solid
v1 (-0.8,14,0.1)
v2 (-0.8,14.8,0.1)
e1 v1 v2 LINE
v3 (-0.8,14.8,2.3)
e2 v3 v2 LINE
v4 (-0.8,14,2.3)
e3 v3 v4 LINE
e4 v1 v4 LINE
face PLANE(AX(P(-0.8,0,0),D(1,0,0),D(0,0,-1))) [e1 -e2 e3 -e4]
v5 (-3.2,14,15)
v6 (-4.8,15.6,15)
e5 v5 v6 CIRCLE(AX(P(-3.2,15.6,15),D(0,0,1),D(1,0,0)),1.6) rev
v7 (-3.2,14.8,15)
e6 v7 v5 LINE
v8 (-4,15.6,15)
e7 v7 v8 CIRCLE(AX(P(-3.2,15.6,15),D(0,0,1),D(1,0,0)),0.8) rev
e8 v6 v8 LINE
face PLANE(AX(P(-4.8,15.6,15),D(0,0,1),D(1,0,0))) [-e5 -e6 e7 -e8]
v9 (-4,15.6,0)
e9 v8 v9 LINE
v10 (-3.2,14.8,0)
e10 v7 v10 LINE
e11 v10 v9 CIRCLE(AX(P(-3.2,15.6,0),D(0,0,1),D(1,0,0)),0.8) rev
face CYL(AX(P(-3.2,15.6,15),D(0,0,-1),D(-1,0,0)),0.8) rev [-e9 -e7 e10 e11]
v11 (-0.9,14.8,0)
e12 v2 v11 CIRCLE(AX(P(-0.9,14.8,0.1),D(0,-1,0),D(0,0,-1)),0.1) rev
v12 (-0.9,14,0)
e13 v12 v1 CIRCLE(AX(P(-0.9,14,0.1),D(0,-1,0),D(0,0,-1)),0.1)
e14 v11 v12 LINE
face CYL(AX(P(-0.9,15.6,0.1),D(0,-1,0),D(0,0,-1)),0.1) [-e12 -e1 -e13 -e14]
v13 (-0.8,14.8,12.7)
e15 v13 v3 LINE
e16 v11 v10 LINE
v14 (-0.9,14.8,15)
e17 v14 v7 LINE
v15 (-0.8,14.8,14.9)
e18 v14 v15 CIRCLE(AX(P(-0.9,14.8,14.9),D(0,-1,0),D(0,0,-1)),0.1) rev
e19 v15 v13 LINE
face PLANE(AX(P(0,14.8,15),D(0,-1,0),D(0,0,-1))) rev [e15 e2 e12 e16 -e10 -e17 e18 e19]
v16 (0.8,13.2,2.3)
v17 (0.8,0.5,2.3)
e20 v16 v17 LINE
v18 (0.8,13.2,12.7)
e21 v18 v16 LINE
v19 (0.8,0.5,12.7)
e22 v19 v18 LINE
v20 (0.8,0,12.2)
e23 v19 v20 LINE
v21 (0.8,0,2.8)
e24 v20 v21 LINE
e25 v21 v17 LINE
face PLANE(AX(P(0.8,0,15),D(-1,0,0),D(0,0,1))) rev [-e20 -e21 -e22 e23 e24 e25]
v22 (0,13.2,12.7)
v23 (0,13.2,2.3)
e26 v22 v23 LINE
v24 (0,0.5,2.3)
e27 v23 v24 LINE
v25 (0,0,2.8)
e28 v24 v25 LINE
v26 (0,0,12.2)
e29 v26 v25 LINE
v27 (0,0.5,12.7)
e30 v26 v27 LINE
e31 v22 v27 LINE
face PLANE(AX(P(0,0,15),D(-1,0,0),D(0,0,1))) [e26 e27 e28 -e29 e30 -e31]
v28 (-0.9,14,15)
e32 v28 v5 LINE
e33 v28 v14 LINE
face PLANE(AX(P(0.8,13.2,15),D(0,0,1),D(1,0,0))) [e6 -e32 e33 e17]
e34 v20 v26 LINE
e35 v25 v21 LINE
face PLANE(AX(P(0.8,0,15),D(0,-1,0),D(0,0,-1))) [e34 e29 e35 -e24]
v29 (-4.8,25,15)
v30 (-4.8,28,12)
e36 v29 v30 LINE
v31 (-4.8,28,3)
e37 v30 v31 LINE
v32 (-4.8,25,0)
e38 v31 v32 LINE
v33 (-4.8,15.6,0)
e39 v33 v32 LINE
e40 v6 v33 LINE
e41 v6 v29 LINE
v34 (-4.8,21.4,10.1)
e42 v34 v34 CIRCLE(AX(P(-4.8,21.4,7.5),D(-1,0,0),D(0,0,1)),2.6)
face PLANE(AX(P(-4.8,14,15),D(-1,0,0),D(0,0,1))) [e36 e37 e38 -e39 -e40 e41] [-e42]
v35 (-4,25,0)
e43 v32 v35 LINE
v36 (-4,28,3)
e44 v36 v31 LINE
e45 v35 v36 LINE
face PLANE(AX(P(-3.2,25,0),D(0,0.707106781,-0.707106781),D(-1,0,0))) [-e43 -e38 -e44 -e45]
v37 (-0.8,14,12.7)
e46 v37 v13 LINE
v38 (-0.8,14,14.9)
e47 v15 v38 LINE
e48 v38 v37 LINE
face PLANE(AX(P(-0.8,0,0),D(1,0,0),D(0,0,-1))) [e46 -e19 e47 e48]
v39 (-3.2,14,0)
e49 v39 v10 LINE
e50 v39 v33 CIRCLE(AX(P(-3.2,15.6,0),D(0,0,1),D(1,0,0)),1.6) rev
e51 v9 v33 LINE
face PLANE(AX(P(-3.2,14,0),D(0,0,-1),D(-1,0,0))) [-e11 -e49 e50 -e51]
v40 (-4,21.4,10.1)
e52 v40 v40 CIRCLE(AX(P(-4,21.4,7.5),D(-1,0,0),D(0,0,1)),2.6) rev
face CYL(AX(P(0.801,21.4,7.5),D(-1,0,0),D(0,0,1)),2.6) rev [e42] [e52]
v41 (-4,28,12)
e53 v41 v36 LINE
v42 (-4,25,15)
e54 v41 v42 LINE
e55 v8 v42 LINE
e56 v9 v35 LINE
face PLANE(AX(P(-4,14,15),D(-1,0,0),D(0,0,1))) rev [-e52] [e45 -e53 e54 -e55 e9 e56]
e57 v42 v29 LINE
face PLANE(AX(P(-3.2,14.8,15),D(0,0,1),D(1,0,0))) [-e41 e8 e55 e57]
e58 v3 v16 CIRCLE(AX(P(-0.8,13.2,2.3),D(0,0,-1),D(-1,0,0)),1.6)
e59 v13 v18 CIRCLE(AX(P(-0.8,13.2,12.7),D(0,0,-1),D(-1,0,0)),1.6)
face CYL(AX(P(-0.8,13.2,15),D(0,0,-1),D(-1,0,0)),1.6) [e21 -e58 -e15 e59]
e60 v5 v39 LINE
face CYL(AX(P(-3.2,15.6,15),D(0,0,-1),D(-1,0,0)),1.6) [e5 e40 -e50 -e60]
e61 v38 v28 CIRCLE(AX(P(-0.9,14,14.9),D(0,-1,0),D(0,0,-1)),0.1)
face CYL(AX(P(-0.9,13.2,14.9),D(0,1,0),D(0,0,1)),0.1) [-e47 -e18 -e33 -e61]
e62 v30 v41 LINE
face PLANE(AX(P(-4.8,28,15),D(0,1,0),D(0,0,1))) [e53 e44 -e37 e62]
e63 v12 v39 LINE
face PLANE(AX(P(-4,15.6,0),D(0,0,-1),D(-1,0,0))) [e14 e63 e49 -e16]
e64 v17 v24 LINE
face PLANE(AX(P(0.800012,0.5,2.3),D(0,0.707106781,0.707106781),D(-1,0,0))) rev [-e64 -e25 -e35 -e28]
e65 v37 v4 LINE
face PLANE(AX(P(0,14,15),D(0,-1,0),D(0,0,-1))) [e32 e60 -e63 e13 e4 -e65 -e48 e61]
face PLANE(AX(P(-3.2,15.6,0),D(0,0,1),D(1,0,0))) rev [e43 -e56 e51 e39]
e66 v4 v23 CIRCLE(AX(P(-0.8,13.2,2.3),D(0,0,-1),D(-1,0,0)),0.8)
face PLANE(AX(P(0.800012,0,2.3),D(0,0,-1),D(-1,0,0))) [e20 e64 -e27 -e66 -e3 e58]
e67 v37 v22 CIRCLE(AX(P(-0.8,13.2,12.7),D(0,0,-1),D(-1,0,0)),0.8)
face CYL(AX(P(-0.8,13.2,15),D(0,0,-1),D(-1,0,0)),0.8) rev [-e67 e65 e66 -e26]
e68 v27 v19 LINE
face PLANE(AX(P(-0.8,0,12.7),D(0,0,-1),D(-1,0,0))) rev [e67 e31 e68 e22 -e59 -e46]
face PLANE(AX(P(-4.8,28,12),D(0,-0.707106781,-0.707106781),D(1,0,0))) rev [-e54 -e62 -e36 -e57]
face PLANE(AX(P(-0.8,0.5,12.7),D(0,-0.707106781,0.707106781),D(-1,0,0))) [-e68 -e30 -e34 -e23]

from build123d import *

# Parameters (mm, degrees)
ODGI_CIE_BAZOWE1_DEPTH          = 15
WYTNIJ_WYCI_GNI_CIE1_DEPTH      = 33.254612073
WYTNIJ_WYCI_GNI_CIE1_DEPTH_BACK = 1.6
SZKIC6_W                        = 2.3
SZKIC6_H                        = 1.6
SZKIC6_H_2                      = 13.2
WYTNIJ_WYCI_GNI_CIE2_REACH      = 34.255
SZKIC7_R                        = 2.6
SFAZOWANIE1_SIZE                = 3
ZAOKR_GLENIE1_R                 = 0.1
SFAZOWANIE2_SIZE                = 0.5


# Sheet-metal steps are written as plain solids
with BuildPart() as part:
    # Szkic1 → Odgięcie bazowe1 (new body)
    with BuildSketch(Plane.XY):
        with BuildLine():
            Line((0, 0), (0, 13.2))
            ThreePointArc((0, 13.2), (-0.234314575, 13.765685425), (-0.8, 14))
            Line((-0.8, 14), (-3.2, 14))
            ThreePointArc((-3.2, 14), (-4.33137085, 14.46862915), (-4.8, 15.6))
            Line((-4.8, 15.6), (-4.8, 28))
            Line((-4.8, 28), (-4, 28))
            Line((-4, 28), (-4, 15.6))
            ThreePointArc((-4, 15.6), (-3.765685425, 15.034314575), (-3.2, 14.8))
            Line((-3.2, 14.8), (-0.8, 14.8))
            ThreePointArc((-0.8, 14.8), (0.33137085, 14.33137085), (0.8, 13.2))
            Line((0.8, 13.2), (0.8, 0))
            Line((0.8, 0), (0, 0))
        make_face()
    extrude(amount=ODGI_CIE_BAZOWE1_DEPTH)

    # Szkic6 → Wytnij-wyciągnięcie1 (cut, two sides: drawn at the far end of the back side and taken through both)
    with BuildSketch(Plane(origin=(0.8, 0, 0), x_dir=(0, 0, -1), z_dir=(1, 0, 0)).offset(-WYTNIJ_WYCI_GNI_CIE1_DEPTH_BACK)):
        with Locations((-13.85, 14)):
            Rectangle(SZKIC6_W, SZKIC6_H)
        with Locations((-1.15, 14)):
            Rectangle(SZKIC6_W, SZKIC6_H)
        with Locations((-1.15, 6.6)):
            Rectangle(SZKIC6_W, SZKIC6_H_2)
        with Locations((-13.85, 6.6)):
            Rectangle(SZKIC6_W, SZKIC6_H_2)
    extrude(amount=WYTNIJ_WYCI_GNI_CIE1_DEPTH + WYTNIJ_WYCI_GNI_CIE1_DEPTH_BACK, mode=Mode.SUBTRACT)

    # Szkic7 → Wytnij-wyciągnięcie2 (cut, up to next)
    with BuildSketch(Plane.ZY.offset(4.8), mode=Mode.PRIVATE) as wytnij_wyci_gni_cie2_sk1:
        with Locations((7.5, 21.4)):
            Circle(SZKIC7_R)
    wytnij_wyci_gni_cie2_tool1 = extrude(wytnij_wyci_gni_cie2_sk1.sketch, amount=-WYTNIJ_WYCI_GNI_CIE2_REACH, mode=Mode.PRIVATE) & part.part
    add(wytnij_wyci_gni_cie2_tool1.solids().sort_by_distance((-4.8, 21.4, 7.5))[0], mode=Mode.SUBTRACT)

    # Sfazowanie1
    sfazowanie1_edges = [part.edges().sort_by_distance(p)[0] for p in [
        (-4.4, 28, 0),
        (-4.4, 28, 15),
    ]]
    chamfer(sfazowanie1_edges, length=SFAZOWANIE1_SIZE)

    # Zaokrąglenie1
    zaokr_glenie1_edges = [part.edges().sort_by_distance(p)[0] for p in [
        (-0.8, 14.4, 0),
        (-0.8, 14.4, 15),
    ]]
    fillet(zaokr_glenie1_edges, radius=ZAOKR_GLENIE1_R)

    # Sfazowanie2
    sfazowanie2_edges = [part.edges().sort_by_distance(p)[0] for p in [
        (0.4, 0, 2.3),
        (0.4, 0, 12.7),
    ]]
    chamfer(sfazowanie2_edges, length=SFAZOWANIE2_SIZE)


solid = part.part
